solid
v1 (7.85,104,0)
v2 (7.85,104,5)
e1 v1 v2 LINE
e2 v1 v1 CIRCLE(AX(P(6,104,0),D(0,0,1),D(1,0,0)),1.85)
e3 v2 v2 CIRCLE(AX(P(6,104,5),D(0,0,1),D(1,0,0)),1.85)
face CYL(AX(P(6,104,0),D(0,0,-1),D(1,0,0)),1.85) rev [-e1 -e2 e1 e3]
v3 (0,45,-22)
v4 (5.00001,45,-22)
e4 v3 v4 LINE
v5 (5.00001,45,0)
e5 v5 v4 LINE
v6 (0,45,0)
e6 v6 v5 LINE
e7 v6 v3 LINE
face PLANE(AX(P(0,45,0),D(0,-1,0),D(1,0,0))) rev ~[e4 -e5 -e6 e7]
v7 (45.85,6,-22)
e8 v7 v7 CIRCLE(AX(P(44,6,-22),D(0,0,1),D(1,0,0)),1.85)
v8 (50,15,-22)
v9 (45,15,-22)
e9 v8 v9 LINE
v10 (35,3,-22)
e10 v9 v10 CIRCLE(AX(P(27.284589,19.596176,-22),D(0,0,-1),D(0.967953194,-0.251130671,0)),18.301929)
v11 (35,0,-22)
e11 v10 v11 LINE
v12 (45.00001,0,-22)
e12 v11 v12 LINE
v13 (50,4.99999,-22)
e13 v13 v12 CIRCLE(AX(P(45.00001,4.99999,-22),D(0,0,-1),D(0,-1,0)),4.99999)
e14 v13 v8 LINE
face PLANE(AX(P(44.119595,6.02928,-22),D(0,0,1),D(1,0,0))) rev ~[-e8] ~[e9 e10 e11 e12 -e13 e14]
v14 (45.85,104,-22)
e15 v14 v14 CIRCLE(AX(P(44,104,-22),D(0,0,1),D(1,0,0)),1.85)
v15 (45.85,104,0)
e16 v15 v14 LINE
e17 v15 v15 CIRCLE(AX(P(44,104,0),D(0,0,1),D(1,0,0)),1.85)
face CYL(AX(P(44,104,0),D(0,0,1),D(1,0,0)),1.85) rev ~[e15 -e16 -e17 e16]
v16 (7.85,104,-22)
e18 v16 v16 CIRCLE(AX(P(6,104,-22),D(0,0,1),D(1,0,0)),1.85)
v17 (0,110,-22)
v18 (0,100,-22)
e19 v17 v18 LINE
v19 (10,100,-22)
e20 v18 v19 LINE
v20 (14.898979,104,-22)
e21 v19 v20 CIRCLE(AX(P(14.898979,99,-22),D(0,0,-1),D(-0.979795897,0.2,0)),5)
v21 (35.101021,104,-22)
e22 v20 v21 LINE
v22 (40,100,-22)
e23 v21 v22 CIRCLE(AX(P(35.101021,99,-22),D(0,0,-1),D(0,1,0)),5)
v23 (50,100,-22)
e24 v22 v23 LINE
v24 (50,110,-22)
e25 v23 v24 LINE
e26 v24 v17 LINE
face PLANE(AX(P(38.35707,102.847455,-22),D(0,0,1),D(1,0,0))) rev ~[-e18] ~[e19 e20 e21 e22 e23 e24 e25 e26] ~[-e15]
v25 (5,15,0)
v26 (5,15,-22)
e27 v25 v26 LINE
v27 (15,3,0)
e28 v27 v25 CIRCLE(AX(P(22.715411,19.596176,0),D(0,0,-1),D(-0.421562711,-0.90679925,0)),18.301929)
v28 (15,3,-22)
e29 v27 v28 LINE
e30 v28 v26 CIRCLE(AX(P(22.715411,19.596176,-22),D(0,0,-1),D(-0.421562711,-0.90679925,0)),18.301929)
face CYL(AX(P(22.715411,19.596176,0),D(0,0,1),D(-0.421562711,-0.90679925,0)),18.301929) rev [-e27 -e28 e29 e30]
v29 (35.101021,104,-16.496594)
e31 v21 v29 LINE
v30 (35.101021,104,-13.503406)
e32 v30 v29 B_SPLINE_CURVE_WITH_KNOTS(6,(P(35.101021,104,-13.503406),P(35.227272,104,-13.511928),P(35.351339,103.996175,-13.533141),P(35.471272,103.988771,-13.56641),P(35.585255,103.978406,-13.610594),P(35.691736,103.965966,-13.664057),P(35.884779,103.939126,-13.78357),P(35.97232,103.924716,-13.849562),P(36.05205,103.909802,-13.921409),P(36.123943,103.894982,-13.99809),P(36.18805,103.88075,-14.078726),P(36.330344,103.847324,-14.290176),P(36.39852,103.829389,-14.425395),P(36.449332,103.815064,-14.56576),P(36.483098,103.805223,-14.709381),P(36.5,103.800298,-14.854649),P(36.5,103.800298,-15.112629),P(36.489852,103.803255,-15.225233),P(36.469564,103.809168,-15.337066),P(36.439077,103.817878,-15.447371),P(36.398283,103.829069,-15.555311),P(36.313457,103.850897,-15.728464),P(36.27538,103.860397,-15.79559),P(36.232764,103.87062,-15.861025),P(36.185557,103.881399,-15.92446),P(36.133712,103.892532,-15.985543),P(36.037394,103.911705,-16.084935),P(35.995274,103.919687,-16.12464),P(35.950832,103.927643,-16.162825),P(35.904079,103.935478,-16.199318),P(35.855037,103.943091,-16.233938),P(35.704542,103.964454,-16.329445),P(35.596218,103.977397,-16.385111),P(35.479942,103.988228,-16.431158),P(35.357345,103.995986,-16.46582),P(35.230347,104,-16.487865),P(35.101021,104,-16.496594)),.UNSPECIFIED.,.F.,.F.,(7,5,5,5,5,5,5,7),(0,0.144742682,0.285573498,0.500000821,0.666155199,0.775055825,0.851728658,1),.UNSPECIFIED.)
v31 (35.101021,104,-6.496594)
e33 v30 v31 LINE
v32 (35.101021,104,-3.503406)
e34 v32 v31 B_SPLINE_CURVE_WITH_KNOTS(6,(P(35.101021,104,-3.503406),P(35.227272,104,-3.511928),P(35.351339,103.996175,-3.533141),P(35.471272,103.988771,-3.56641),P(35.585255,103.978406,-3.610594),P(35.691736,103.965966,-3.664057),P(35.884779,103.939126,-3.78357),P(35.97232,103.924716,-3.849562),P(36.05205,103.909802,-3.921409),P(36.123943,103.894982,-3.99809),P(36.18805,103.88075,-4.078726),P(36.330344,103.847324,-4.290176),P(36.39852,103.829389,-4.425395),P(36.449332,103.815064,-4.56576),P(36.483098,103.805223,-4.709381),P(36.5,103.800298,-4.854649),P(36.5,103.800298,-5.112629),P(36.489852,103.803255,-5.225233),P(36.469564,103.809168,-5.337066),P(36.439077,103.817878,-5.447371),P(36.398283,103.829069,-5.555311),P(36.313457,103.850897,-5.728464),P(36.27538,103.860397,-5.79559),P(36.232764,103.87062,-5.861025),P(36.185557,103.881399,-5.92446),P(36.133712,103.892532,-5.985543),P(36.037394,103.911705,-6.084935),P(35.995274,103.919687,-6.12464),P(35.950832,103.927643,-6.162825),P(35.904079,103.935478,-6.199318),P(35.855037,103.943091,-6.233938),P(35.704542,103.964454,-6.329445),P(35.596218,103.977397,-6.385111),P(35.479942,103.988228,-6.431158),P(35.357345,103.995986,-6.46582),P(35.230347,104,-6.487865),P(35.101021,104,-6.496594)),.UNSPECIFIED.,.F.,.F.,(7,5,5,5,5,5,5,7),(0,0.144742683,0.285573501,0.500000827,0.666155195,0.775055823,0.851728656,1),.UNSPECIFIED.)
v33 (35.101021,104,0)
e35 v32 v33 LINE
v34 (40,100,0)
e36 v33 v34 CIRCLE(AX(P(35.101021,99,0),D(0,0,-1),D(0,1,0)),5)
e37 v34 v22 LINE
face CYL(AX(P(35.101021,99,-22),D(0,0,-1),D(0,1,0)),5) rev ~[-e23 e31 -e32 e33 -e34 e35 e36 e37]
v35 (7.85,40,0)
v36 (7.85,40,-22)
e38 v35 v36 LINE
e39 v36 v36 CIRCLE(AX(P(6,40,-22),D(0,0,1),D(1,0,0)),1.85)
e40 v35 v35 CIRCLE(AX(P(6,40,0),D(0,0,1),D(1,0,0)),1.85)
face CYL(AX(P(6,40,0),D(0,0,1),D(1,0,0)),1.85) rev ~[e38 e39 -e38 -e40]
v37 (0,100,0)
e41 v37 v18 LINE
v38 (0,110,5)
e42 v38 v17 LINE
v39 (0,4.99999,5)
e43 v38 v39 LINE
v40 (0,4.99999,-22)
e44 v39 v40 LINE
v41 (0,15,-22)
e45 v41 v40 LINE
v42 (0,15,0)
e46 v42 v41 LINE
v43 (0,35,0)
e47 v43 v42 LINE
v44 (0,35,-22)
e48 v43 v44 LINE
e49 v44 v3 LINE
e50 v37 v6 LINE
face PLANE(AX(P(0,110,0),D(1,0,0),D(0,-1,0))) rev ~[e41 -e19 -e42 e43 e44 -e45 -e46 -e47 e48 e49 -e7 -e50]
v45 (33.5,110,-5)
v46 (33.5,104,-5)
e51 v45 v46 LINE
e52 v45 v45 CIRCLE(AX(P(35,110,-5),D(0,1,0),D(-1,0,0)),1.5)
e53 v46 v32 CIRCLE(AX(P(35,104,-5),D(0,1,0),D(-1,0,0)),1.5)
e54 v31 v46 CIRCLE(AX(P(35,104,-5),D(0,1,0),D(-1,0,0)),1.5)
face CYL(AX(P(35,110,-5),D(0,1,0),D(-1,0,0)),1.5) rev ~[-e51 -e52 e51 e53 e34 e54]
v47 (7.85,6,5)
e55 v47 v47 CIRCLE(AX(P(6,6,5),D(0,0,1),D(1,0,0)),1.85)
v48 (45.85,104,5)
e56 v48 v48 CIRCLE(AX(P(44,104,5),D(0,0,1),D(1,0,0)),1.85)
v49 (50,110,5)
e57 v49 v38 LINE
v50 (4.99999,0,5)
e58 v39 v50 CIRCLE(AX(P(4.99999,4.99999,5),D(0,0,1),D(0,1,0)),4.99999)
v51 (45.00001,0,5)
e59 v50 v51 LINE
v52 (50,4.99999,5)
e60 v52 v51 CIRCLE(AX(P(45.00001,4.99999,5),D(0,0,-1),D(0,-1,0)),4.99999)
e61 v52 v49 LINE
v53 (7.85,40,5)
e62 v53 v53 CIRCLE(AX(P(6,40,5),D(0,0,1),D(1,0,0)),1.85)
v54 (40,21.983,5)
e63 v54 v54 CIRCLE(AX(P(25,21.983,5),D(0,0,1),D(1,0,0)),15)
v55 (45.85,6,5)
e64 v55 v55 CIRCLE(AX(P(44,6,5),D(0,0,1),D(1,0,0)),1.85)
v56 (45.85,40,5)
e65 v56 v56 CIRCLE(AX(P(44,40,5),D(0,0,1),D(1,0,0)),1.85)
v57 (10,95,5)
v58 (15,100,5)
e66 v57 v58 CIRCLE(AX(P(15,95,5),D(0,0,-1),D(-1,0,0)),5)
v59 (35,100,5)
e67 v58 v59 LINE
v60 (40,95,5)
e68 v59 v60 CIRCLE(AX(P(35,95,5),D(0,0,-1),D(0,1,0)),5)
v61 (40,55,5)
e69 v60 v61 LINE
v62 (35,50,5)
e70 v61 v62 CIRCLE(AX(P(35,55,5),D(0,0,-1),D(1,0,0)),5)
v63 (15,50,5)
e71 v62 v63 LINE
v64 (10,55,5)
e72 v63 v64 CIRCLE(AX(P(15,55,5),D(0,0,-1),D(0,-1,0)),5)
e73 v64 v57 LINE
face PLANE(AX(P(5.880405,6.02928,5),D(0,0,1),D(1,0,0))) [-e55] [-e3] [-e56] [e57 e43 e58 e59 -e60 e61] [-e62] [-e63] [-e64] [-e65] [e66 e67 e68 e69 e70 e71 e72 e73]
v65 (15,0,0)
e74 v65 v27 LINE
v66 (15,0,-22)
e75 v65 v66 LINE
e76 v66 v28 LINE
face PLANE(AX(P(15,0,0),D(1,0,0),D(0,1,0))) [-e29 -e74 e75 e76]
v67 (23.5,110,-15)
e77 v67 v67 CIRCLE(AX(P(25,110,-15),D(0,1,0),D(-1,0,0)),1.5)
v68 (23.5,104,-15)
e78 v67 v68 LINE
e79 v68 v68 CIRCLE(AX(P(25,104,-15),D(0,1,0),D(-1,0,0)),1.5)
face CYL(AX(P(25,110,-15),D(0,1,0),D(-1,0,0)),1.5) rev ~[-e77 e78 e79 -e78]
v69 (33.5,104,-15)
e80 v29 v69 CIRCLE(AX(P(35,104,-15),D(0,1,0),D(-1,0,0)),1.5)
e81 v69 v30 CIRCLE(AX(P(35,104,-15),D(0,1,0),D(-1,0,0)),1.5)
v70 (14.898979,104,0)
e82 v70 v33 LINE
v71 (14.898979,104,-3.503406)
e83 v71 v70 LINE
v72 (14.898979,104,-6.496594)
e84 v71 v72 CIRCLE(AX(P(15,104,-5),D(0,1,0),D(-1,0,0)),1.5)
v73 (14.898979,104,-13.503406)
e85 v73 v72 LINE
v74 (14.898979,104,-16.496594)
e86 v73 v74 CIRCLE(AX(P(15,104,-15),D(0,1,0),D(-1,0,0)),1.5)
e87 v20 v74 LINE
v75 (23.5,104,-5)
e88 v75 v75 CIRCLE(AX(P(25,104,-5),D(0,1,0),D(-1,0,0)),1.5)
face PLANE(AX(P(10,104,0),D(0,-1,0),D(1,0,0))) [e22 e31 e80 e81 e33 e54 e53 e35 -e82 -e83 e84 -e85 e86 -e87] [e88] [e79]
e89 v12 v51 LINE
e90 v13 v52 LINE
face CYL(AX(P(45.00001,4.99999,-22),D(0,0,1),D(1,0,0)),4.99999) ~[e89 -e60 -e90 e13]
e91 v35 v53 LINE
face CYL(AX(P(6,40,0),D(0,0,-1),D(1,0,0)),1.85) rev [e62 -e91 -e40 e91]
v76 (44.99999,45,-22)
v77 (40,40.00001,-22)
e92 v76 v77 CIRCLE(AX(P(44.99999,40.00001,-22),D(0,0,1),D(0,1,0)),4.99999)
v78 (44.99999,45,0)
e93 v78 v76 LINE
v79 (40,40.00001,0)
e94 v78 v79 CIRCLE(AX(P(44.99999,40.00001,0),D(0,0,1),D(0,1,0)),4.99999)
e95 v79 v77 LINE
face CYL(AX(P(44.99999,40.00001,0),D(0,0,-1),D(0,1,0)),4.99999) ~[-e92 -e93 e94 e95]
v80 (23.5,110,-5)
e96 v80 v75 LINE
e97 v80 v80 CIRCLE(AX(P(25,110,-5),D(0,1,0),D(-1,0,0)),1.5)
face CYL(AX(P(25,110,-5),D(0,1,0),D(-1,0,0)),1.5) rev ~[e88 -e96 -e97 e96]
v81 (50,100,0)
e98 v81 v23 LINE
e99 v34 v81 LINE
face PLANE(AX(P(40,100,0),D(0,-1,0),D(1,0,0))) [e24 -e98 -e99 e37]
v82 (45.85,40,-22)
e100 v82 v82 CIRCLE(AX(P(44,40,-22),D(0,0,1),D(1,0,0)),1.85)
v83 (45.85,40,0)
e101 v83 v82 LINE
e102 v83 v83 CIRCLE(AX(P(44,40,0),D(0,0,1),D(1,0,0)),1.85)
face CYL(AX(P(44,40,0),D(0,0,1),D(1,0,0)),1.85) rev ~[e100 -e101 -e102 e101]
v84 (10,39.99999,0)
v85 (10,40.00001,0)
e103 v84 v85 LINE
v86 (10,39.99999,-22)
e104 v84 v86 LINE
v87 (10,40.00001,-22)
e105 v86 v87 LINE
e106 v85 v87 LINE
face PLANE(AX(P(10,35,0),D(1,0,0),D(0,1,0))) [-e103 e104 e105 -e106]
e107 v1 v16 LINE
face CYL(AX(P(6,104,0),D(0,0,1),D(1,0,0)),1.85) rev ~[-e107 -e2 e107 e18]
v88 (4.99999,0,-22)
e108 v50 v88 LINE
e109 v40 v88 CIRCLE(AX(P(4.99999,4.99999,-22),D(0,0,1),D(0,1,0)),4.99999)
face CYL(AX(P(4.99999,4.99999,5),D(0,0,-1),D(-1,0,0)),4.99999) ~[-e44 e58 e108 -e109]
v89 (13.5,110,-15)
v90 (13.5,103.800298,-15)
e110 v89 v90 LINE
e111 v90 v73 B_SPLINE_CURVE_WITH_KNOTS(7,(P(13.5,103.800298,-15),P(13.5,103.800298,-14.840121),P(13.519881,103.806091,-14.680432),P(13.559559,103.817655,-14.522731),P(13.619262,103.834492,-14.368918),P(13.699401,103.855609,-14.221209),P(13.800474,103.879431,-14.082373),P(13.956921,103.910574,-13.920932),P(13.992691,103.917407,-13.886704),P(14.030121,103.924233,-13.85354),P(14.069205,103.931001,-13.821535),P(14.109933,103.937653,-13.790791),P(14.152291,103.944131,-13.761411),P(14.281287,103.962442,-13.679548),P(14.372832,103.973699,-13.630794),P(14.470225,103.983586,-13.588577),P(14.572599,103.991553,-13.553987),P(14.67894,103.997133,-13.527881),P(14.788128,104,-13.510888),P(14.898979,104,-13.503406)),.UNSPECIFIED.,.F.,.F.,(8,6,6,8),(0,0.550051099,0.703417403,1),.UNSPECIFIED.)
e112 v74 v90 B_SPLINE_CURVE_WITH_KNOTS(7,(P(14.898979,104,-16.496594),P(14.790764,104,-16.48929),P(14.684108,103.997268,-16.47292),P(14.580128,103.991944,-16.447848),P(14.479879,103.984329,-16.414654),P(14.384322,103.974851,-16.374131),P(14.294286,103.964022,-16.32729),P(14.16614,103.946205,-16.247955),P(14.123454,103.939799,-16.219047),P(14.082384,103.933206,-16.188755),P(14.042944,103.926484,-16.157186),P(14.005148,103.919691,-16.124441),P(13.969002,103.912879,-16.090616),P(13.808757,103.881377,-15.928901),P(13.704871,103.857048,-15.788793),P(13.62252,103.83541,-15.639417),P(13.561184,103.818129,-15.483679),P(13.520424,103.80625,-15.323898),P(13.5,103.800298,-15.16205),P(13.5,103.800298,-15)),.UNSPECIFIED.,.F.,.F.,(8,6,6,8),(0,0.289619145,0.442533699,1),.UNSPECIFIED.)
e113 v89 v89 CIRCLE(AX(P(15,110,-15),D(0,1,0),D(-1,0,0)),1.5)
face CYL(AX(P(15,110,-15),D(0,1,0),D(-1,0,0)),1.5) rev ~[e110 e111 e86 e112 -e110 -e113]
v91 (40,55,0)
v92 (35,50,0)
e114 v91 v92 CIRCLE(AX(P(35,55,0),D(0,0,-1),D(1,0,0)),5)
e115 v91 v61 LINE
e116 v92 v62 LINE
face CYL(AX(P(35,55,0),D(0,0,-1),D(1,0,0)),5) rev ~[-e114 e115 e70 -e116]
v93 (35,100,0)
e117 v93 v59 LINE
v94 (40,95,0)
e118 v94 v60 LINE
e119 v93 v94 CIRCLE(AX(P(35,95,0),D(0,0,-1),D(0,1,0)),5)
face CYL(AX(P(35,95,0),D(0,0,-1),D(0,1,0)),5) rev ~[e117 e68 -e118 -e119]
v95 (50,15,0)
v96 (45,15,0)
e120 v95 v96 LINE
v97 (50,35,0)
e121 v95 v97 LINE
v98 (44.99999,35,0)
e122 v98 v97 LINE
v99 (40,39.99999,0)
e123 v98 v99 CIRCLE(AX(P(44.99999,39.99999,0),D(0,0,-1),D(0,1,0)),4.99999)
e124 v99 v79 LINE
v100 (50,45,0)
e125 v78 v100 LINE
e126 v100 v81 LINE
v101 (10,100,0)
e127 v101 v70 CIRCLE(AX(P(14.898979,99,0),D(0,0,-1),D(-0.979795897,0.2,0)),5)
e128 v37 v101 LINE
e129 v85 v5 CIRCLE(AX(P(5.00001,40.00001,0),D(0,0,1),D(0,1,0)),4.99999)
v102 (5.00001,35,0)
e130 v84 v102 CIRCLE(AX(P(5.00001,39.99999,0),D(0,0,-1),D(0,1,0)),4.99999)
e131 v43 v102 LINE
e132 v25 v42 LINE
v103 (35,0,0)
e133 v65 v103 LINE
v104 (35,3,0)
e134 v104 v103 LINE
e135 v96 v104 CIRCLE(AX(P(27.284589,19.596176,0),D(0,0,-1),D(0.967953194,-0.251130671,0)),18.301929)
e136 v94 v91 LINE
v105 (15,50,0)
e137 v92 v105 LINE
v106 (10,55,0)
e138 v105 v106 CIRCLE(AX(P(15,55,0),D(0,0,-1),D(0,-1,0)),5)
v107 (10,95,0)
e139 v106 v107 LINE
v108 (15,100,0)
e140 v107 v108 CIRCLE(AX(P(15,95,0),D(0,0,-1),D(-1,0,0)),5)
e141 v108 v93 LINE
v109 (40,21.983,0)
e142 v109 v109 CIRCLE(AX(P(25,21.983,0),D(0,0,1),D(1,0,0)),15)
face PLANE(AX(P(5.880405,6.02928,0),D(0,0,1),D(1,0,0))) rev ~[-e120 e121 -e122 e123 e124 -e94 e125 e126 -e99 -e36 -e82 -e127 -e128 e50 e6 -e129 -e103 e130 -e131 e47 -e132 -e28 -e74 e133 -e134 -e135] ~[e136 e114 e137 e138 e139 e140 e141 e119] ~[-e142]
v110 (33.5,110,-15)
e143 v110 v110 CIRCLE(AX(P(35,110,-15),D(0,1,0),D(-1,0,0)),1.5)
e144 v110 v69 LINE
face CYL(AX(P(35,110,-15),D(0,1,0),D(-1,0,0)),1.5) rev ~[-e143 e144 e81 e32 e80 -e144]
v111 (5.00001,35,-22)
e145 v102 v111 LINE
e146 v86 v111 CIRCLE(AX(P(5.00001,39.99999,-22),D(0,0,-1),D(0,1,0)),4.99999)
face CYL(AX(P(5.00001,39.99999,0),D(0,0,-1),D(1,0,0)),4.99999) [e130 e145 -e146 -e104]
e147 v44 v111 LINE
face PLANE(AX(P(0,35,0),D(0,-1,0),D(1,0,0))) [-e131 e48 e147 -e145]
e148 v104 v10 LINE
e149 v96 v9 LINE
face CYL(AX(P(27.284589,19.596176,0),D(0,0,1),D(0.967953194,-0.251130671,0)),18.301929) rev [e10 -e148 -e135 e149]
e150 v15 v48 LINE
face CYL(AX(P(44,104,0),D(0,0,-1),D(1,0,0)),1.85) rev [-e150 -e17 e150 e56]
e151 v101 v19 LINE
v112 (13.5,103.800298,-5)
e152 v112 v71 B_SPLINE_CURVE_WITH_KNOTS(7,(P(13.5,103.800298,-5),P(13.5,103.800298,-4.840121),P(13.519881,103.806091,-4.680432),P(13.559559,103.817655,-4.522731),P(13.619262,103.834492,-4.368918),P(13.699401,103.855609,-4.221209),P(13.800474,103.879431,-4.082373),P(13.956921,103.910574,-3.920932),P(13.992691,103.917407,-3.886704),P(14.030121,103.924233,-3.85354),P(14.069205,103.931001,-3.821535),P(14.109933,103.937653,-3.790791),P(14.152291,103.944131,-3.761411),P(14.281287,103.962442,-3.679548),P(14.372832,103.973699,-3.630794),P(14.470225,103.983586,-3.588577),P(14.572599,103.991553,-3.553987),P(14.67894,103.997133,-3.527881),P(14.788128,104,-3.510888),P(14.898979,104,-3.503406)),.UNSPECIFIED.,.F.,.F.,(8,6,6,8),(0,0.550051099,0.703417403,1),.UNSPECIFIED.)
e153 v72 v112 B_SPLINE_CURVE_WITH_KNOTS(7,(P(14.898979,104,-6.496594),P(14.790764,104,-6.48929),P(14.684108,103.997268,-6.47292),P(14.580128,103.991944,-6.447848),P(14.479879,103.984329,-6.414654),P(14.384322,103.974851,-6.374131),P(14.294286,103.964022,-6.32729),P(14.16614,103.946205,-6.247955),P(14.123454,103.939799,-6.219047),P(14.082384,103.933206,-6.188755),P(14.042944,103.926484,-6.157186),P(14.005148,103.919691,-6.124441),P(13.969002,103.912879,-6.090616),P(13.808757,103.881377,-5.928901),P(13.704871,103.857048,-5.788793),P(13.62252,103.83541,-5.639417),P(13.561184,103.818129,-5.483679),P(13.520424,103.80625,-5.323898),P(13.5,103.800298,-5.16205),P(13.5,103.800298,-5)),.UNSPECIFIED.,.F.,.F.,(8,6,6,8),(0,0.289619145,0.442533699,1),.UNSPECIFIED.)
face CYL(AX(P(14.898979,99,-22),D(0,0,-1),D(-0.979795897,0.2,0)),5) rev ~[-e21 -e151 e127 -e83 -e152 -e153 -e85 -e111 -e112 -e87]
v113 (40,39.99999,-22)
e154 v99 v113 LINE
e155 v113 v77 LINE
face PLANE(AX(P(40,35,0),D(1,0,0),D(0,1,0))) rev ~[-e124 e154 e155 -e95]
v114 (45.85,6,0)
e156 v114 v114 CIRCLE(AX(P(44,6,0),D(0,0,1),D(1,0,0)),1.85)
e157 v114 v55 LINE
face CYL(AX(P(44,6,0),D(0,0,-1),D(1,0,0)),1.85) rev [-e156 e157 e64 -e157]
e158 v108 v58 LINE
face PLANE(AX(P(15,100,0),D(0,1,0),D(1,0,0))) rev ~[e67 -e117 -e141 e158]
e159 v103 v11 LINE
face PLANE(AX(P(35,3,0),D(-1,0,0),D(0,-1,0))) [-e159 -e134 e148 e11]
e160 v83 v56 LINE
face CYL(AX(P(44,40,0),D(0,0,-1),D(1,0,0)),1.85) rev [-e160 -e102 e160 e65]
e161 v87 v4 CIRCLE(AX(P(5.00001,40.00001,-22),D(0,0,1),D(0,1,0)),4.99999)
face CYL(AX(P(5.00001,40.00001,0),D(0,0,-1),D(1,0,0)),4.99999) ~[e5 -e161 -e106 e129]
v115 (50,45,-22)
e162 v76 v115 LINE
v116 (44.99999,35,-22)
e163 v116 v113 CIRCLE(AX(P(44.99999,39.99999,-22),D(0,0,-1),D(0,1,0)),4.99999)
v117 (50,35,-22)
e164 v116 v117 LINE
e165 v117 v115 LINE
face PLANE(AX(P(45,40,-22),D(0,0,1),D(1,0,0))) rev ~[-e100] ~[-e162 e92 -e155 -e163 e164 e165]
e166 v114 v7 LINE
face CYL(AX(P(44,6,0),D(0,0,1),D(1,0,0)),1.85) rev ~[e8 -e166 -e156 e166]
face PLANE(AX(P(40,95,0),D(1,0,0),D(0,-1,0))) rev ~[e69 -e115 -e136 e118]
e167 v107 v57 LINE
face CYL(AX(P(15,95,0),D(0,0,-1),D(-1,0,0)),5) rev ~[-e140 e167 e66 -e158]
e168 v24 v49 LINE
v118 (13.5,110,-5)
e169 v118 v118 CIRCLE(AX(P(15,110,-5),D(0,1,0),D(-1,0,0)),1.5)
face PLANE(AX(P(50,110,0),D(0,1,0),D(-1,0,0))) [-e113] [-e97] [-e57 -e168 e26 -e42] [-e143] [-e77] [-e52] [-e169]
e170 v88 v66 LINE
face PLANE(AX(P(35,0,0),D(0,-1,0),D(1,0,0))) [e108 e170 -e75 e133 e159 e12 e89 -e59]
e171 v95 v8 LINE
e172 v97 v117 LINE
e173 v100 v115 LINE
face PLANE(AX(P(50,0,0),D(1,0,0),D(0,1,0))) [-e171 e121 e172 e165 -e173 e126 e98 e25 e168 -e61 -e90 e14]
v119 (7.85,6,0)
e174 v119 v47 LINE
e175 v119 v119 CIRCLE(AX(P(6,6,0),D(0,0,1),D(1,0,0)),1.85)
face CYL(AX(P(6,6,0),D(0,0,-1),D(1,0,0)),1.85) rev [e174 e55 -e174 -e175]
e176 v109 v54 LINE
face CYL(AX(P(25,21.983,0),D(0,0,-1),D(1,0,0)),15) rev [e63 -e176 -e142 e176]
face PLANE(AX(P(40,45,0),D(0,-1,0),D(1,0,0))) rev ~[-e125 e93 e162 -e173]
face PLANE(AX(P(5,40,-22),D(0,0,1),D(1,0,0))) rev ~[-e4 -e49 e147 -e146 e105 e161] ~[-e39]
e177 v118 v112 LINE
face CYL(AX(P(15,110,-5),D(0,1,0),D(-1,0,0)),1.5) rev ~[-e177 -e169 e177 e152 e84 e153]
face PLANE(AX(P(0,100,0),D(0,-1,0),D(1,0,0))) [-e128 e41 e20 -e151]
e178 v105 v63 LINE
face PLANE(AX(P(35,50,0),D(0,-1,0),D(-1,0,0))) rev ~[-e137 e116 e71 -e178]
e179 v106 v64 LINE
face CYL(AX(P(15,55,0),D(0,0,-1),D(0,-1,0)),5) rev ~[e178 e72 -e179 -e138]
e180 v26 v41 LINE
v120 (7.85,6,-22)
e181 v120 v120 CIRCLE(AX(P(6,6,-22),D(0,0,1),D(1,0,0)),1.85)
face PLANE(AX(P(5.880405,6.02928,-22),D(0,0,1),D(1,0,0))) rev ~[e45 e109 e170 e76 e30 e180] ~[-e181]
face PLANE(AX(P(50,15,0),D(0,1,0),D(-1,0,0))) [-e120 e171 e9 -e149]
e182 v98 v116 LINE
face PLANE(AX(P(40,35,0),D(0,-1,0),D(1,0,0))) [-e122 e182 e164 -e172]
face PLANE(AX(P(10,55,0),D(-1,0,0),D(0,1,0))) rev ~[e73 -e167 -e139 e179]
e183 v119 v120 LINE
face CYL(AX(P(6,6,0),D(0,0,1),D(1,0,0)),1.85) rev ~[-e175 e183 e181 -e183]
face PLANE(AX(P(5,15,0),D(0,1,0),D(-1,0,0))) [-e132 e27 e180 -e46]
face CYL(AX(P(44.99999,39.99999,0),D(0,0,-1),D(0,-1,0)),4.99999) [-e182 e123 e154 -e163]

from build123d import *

# Parameters (mm, degrees)
F0_R        = 1.85
F0_R_2      = 15
F0_W        = 10
F0_H        = 10
F1_DEPTH    = 5
F2_DEPTH    = 22
F3_R        = 4.99999
F4_T1_DEPTH = 22
F5_R        = 1.5
F6_DEPTH    = 25


# Not quite as in the source:
# - a fillet or chamfer that OpenCascade refuses, or shapes differently, is made with other operations: its cross-section is extruded or revolved along the edge and cut away or added
# - a fillet or chamfer is up to 0.001 mm smaller than in the source, because OpenCascade refuses the exact size
# - a feature names something its author has since deleted; it is built from what else it names


with BuildPart() as f1:
    # F0 (on Top) → F1 (new body)
    with BuildSketch(Plane.XY):
        with BuildLine():
            Line((0, 15), (0, 0))
            Line((0, 0), (15, 0))
            Line((15, 0), (15, 3))
            ThreePointArc((15, 3), (8.6554793841, 7.8795661534), (5, 15))
            Line((5, 15), (0, 15))
        make_face()
        with Locations((6, 6)):
            Circle(F0_R, mode=Mode.SUBTRACT)
        with BuildLine():
            Line((15, 3), (15, 0))
            Line((15, 0), (35, 0))
            Line((35, 0), (35, 3))
            ThreePointArc((35, 3), (41.3445206159, 7.8795661534), (45, 15))
            Line((45, 15), (50, 15))
            Line((50, 15), (50, 35))
            Line((50, 35), (40, 35))
            Line((40, 35), (40, 45))
            Line((40, 45), (50, 45))
            Line((50, 45), (50, 100))
            Line((50, 100), (40, 100))
            Line((40, 100), (40, 104))
            Line((40, 104), (10, 104))
            Line((10, 104), (10, 100))
            Line((10, 100), (0, 100))
            Line((0, 100), (0, 45))
            Line((0, 45), (10, 45))
            Line((10, 45), (10, 35))
            Line((10, 35), (0, 35))
            Line((0, 35), (0, 15))
            Line((0, 15), (5, 15))
            ThreePointArc((5, 15), (8.6554793841, 7.8795661534), (15, 3))
        make_face()
        with Locations((25, 21.983)):
            Circle(F0_R_2, mode=Mode.SUBTRACT)
        with BuildLine():
            Line((15, 100), (35, 100))
            ThreePointArc((35, 100), (38.5355339059, 98.5355339059), (40, 95))
            Line((40, 95), (40, 55))
            ThreePointArc((40, 55), (38.5355339059, 51.4644660941), (35, 50))
            Line((35, 50), (15, 50))
            ThreePointArc((15, 50), (11.4644660941, 51.4644660941), (10, 55))
            Line((10, 55), (10, 95))
            ThreePointArc((10, 95), (11.4644660941, 98.5355339059), (15, 100))
        make_face(mode=Mode.SUBTRACT)
        with BuildLine():
            Line((35, 3), (35, 0))
            Line((35, 0), (50, 0))
            Line((50, 0), (50, 15))
            Line((50, 15), (45, 15))
            ThreePointArc((45, 15), (41.3445206159, 7.8795661534), (35, 3))
        make_face()
        with Locations((44, 6)):
            Circle(F0_R, mode=Mode.SUBTRACT)
        Polygon((0, 110), (0, 100), (10, 100), (10, 104), (40, 104), (40, 100), (50, 100), (50, 110), align=None)
        with Locations((6, 104)):
            Circle(F0_R, mode=Mode.SUBTRACT)
        with Locations((44, 104)):
            Circle(F0_R, mode=Mode.SUBTRACT)
        with Locations((5, 40)):
            Rectangle(F0_W, F0_H)
        with Locations((6, 40)):
            Circle(F0_R, mode=Mode.SUBTRACT)
        with Locations((45, 40)):
            Rectangle(F0_W, F0_H)
        with Locations((44, 40)):
            Circle(F0_R, mode=Mode.SUBTRACT)
    extrude(amount=F1_DEPTH)

    # F0 (on Top) → F2 (join)
    with BuildSketch(Plane.XY):
        with BuildLine():
            Line((35, 3), (35, 0))
            Line((35, 0), (50, 0))
            Line((50, 0), (50, 15))
            Line((50, 15), (45, 15))
            ThreePointArc((45, 15), (41.3445206159, 7.8795661534), (35, 3))
        make_face()
        with Locations((44, 6)):
            Circle(F0_R, mode=Mode.SUBTRACT)
        with BuildLine():
            Line((0, 15), (0, 0))
            Line((0, 0), (15, 0))
            Line((15, 0), (15, 3))
            ThreePointArc((15, 3), (8.6554793841, 7.8795661534), (5, 15))
            Line((5, 15), (0, 15))
        make_face()
        with Locations((6, 6)):
            Circle(F0_R, mode=Mode.SUBTRACT)
        with Locations((45, 40)):
            Rectangle(F0_W, F0_H)
        with Locations((44, 40)):
            Circle(F0_R, mode=Mode.SUBTRACT)
        with Locations((5, 40)):
            Rectangle(F0_W, F0_H)
        with Locations((6, 40)):
            Circle(F0_R, mode=Mode.SUBTRACT)
        Polygon((0, 110), (0, 100), (10, 100), (10, 104), (40, 104), (40, 100), (50, 100), (50, 110), align=None)
        with Locations((6, 104)):
            Circle(F0_R, mode=Mode.SUBTRACT)
        with Locations((44, 104)):
            Circle(F0_R, mode=Mode.SUBTRACT)
    extrude(amount=-F2_DEPTH)

    # F3 (radius 5 in the source; OpenCascade refuses exactly that, so slightly less here)
    f3_edges = [f1.edges().sort_by_distance(p)[0] for p in [
        (50, 0, -8.5),
        (0, 0, -8.5),
        (40, 35, -11),
        (40, 45, -11),
        (10, 35, -11),
        (10, 45, -11),
    ]]
    fillet(f3_edges, radius=F3_R)

    # F4: fillet of radius 5 on 2 edges, made by hand

    # F4_s2 → F4_t1 (join)
    with BuildSketch(Plane.XY.offset(-22)):
        with BuildLine():
            ThreePointArc((35.1010205144, 104), (38.2632981746, 102.8729833462), (40, 100))
            Line((40, 100), (40, 104))
            Line((40, 104), (35.1010205144, 104))
        make_face()
        with BuildLine():
            ThreePointArc((10, 100), (11.7367018254, 102.8729833462), (14.8989794856, 104))
            Line((14.8989794856, 104), (10, 104))
            Line((10, 104), (10, 100))
        make_face()
    extrude(amount=F4_T1_DEPTH)

    # F5 (on face) → F6 (cut)
    with BuildSketch(Plane(origin=(0, 110, 0), x_dir=(-1, 0, 0), z_dir=(0, 1, 0))):
        with Locations((-35, -15)):
            Circle(F5_R)
        with Locations((-35, -5)):
            Circle(F5_R)
        with Locations((-15, -5)):
            Circle(F5_R)
        with Locations((-15, -15)):
            Circle(F5_R)
        with Locations((-25, -15)):
            Circle(F5_R)
        with Locations((-25, -5)):
            Circle(F5_R)
    extrude(amount=-F6_DEPTH, mode=Mode.SUBTRACT)


solid = f1.part
